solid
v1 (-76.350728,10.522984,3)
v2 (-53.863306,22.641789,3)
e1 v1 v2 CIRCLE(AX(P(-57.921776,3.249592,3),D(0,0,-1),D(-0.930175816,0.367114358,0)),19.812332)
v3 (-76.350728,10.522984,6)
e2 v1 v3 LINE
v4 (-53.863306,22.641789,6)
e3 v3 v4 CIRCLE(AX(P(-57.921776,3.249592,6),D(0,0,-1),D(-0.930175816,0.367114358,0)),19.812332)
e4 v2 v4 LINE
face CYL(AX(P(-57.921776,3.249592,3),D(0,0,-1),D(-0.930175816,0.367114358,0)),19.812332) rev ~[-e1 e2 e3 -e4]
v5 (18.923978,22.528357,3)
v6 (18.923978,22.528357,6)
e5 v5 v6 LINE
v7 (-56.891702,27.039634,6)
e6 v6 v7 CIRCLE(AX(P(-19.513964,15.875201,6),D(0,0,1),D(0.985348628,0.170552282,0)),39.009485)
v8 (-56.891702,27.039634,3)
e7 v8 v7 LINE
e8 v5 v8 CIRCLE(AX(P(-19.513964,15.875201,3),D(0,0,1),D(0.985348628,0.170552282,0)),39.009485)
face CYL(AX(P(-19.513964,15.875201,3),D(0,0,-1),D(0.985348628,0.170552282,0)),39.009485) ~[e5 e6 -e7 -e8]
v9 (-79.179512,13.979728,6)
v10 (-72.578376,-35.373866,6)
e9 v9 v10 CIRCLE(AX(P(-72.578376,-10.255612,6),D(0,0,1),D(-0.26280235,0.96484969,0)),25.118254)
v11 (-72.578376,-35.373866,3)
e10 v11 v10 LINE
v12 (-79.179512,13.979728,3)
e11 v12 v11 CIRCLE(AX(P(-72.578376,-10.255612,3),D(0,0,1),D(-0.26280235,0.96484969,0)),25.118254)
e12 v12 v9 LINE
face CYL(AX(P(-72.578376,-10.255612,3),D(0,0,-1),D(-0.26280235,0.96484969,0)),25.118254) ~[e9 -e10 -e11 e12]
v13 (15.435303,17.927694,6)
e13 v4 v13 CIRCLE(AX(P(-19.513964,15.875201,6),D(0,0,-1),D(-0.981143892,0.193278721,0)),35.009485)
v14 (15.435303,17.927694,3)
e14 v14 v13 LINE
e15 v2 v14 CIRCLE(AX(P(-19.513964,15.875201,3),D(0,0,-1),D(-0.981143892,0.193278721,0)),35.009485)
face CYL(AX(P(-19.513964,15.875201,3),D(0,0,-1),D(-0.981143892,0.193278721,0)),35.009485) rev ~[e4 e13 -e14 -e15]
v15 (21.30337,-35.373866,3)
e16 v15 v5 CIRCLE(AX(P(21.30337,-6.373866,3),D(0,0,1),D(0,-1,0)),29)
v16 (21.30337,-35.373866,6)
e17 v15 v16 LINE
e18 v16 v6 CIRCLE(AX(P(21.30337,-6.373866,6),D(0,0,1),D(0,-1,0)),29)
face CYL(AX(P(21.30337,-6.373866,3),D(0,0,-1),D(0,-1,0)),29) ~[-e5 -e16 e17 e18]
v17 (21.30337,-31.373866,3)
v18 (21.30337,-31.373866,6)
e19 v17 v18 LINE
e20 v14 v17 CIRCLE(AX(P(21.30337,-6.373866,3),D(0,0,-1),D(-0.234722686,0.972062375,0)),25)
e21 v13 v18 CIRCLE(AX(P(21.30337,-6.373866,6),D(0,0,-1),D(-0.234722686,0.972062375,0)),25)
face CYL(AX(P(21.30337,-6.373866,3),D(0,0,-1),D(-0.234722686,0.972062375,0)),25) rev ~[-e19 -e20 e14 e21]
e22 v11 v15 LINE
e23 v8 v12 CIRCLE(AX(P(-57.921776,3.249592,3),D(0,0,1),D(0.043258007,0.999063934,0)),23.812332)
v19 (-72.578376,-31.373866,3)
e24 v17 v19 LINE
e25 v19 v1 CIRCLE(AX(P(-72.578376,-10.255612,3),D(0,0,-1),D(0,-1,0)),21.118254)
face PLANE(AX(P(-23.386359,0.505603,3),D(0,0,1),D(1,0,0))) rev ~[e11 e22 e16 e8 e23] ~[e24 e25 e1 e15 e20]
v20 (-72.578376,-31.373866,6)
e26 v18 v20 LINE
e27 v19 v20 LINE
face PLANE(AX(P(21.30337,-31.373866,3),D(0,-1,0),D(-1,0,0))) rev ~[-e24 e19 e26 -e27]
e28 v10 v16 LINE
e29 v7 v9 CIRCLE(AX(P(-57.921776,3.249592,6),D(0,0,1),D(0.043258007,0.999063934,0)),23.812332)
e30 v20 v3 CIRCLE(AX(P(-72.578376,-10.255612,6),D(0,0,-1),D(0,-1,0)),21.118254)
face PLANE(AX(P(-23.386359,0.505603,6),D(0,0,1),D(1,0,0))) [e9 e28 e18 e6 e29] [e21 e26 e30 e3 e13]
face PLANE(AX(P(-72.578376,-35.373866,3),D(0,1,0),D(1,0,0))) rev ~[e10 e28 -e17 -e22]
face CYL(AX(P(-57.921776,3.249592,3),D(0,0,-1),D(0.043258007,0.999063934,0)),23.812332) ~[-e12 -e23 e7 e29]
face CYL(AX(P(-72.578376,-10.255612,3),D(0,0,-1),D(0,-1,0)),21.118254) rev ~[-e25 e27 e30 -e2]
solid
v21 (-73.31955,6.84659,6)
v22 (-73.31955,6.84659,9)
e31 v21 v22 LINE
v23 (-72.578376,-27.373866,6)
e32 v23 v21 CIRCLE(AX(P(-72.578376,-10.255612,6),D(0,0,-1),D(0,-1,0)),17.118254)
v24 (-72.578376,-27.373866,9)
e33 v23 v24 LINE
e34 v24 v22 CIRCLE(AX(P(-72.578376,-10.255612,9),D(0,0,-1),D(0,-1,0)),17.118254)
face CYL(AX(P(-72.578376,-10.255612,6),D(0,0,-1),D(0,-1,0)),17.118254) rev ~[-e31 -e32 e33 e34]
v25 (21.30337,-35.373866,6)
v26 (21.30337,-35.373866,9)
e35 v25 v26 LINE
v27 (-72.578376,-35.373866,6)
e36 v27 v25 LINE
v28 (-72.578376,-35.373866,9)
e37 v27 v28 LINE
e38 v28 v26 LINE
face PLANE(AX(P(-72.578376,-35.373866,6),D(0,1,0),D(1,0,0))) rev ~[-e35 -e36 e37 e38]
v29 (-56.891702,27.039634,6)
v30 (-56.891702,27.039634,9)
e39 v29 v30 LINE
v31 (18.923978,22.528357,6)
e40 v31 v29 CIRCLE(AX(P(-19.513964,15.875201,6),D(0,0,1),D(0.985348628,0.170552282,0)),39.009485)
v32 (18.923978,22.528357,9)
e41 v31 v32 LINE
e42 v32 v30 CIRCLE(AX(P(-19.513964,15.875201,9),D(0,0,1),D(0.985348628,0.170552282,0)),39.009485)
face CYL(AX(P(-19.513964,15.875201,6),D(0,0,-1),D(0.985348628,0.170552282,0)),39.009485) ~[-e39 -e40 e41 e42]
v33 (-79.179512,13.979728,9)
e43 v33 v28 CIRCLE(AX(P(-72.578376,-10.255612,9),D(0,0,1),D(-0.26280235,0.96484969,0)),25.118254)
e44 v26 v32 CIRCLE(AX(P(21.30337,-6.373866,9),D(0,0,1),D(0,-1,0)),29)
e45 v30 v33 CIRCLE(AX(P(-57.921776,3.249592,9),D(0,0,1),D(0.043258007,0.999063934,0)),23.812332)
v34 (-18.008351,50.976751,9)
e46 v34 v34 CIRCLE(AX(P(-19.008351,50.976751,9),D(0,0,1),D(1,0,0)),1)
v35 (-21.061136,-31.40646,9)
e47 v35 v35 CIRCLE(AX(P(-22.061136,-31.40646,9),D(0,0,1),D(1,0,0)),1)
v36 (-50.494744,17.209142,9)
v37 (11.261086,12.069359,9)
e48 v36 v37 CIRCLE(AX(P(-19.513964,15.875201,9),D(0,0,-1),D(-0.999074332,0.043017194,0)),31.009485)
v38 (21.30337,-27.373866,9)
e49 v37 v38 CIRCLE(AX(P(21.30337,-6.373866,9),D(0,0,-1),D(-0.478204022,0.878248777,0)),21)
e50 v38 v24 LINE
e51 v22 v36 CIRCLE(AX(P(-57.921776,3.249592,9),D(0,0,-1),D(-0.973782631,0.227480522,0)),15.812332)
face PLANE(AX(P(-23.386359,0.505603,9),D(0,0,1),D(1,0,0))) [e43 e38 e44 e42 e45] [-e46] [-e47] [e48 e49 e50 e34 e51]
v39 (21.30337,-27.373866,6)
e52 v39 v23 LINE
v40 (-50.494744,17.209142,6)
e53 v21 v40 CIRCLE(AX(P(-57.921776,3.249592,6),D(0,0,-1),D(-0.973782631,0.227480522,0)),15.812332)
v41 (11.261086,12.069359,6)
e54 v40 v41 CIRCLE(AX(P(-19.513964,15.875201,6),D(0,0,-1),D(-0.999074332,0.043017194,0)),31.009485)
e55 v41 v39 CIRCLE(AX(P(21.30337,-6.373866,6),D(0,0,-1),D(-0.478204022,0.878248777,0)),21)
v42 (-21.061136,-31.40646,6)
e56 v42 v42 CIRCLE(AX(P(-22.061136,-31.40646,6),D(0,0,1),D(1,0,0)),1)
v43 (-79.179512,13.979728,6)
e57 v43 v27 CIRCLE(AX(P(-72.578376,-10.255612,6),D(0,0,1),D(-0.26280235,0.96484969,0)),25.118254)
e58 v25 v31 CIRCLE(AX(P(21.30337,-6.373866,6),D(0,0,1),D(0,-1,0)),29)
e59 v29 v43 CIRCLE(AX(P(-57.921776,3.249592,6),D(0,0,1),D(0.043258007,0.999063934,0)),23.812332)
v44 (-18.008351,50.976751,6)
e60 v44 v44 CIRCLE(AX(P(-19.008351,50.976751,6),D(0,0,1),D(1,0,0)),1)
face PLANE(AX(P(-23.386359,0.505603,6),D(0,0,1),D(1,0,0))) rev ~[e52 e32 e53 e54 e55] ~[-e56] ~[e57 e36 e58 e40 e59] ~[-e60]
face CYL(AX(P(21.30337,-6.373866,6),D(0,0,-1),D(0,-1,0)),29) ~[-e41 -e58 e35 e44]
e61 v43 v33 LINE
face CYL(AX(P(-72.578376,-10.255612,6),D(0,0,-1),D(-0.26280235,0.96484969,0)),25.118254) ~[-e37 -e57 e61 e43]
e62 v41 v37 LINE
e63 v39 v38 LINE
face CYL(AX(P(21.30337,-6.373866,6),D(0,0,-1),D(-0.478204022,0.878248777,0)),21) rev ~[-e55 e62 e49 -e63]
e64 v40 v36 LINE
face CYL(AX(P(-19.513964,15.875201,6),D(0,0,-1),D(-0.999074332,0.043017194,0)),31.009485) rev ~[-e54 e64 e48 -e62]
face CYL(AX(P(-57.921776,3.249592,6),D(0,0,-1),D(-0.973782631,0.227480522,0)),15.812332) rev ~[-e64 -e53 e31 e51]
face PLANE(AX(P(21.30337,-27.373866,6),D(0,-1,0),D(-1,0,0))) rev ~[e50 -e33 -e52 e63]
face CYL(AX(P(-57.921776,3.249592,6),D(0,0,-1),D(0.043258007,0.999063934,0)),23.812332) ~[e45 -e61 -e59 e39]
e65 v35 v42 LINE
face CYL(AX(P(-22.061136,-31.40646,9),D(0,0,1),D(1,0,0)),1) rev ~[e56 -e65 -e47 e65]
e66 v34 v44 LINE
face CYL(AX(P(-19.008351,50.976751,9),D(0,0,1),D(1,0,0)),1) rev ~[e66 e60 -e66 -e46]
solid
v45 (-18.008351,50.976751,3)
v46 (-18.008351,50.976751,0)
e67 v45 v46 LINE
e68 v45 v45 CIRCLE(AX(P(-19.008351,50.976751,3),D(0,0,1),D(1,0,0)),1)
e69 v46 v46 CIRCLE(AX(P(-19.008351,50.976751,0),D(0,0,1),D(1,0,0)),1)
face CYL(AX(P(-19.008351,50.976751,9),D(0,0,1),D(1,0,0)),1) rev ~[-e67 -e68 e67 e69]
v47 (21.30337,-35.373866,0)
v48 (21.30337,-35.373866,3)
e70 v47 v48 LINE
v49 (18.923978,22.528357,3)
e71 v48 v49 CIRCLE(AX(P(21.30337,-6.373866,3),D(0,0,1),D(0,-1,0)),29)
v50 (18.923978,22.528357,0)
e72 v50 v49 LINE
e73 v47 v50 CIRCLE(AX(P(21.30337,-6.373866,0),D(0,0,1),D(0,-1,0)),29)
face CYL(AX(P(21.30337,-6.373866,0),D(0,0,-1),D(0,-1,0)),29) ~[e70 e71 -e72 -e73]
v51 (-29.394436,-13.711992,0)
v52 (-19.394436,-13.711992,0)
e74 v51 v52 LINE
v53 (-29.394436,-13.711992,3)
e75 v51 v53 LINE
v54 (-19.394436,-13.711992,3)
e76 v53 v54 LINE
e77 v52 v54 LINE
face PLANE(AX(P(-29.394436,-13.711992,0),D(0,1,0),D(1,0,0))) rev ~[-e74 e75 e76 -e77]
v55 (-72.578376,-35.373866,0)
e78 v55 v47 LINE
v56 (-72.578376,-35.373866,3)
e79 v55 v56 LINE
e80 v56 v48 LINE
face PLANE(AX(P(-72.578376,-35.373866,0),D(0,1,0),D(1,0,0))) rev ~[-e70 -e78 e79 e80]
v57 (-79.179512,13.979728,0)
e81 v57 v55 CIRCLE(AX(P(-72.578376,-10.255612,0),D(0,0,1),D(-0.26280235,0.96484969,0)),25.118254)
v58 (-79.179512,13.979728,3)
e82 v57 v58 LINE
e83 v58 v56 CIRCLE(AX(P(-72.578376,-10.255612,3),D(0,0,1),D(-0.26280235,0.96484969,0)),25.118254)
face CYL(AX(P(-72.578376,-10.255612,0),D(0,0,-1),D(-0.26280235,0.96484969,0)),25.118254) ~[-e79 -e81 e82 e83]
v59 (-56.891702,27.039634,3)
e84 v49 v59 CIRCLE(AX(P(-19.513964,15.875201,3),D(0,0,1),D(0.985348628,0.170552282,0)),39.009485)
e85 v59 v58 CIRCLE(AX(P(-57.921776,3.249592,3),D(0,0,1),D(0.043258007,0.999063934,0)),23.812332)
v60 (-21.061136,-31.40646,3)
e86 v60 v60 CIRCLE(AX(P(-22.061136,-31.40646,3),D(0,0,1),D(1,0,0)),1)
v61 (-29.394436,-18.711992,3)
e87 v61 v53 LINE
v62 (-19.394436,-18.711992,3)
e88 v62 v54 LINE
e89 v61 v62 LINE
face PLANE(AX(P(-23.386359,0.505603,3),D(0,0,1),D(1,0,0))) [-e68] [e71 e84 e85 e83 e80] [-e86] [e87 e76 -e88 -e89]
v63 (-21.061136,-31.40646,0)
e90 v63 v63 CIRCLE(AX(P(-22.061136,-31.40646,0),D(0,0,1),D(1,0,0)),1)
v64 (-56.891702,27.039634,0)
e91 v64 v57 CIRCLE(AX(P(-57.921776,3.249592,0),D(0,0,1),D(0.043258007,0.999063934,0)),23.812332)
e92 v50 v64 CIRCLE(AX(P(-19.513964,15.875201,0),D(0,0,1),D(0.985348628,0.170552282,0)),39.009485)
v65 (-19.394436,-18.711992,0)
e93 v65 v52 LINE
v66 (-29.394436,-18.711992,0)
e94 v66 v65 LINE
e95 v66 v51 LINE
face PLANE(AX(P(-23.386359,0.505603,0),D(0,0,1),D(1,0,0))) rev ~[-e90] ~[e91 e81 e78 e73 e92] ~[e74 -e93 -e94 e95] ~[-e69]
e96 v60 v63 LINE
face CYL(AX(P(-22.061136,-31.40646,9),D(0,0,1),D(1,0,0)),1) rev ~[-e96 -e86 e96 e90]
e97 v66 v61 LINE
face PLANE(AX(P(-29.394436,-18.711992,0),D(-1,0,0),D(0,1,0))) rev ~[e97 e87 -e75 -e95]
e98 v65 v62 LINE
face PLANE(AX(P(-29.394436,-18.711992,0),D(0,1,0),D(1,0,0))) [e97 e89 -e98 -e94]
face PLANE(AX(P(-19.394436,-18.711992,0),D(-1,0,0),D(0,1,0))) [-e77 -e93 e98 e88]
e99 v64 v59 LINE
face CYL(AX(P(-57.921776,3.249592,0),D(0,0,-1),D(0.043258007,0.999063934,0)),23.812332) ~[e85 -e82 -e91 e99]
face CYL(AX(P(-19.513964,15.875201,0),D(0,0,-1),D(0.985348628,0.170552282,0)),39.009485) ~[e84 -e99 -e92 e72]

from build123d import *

# Parameters (mm, degrees)
F1_W     = 10
F1_H     = 5
F2_DEPTH = 3
F4_DEPTH = 3
F6_DEPTH = 3
F7_R     = 1
F8_DEPTH = 9.001


with BuildPart() as f2:
    # F1 (on Top) → F2 (new body)
    with BuildSketch(Plane.XY):
        with BuildLine():
            ThreePointArc((18.9239778624, 22.528357261), (-17.196872912, 54.8158089274), (-56.8917024575, 27.0396338283))
            ThreePointArc((-56.8917024575, 27.0396338283), (-69.9604581217, 23.7945983478), (-79.1795119252, 13.9797281576))
            ThreePointArc((-79.1795119252, 13.9797281576), (-97.4749227856, -13.5855716738), (-72.5783757035, -35.3738657037))
            Line((-72.5783757035, -35.3738657037), (21.3033701587, -35.3738657037))
            ThreePointArc((21.3033701587, -35.3738657037), (50.2789155891, -5.1831654845), (18.9239778624, 22.528357261))
        make_face()
        with Locations((-24.3944358081, -16.2119916081)):
            Rectangle(F1_W, F1_H, mode=Mode.SUBTRACT)
    extrude(amount=F2_DEPTH)


with BuildPart() as f4:
    # F3 (on face) → F4 (new body)
    with BuildSketch(Plane.XY.offset(3)):
        with BuildLine():
            ThreePointArc((21.3033701587, -35.3738657037), (50.2789155891, -5.1831654845), (18.9239778624, 22.528357261))
            ThreePointArc((18.9239778624, 22.528357261), (-17.196872912, 54.8158089274), (-56.8917024575, 27.0396338283))
            ThreePointArc((-56.8917024575, 27.0396338283), (-69.9604581217, 23.7945983478), (-79.1795119252, 13.9797281576))
            ThreePointArc((-79.1795119252, 13.9797281576), (-97.4749227856, -13.5855716738), (-72.5783757035, -35.3738657037))
            Line((-72.5783757035, -35.3738657037), (21.3033701587, -35.3738657037))
        make_face()
        with BuildLine():
            ThreePointArc((-76.3507281586, 10.522983545), (-67.3209277766, 20.6904762333), (-53.8633061169, 22.641789065))
            ThreePointArc((-53.8633061169, 22.641789065), (-17.1379062519, 50.8039618254), (15.4353030162, 17.9276936704))
            ThreePointArc((15.4353030162, 17.9276936704), (46.1281459316, -3.4191224282), (21.3033701587, -31.3738657037))
            Line((21.3033701587, -31.3738657037), (-72.5783757035, -31.3738657037))
            ThreePointArc((-72.5783757035, -31.3738657037), (-93.6115436771, -12.149418004), (-76.3507281586, 10.522983545))
        make_face(mode=Mode.SUBTRACT)
    extrude(amount=F4_DEPTH)


with BuildPart() as f6:
    # F5 (on face) → F6 (new body)
    with BuildSketch(Plane.XY.offset(6)):
        with BuildLine():
            ThreePointArc((18.9239778624, 22.528357261), (-17.196872912, 54.8158089274), (-56.8917024575, 27.0396338283))
            ThreePointArc((-56.8917024575, 27.0396338283), (-69.9604581217, 23.7945983478), (-79.1795119252, 13.9797281576))
            ThreePointArc((-79.1795119252, 13.9797281576), (-97.4749227856, -13.5855716738), (-72.5783757035, -35.3738657037))
            Line((-72.5783757035, -35.3738657037), (21.3033701587, -35.3738657037))
            ThreePointArc((21.3033701587, -35.3738657037), (50.2789155891, -5.1831654845), (18.9239778624, 22.528357261))
        make_face()
        with BuildLine():
            ThreePointArc((-73.3195503129, 6.846589606), (-64.4585036261, 17.6475443755), (-50.494744269, 17.2091416674))
            ThreePointArc((-50.494744269, 17.2091416674), (-16.9420148184, 46.7778414524), (11.2610857029, 12.0693586052))
            ThreePointArc((11.2610857029, 12.0693586052), (41.6541405432, -1.1925391596), (21.3033701587, -27.3738657037))
            Line((21.3033701587, -27.3738657037), (-72.5783757035, -27.3738657037))
            ThreePointArc((-72.5783757035, -27.3738657037), (-89.6926161293, -10.6262857825), (-73.3195503129, 6.846589606))
        make_face(mode=Mode.SUBTRACT)
    extrude(amount=F6_DEPTH)


with BuildPart() as f8_tool:
    # F7 (on face) → F8 (new body, through all)
    with BuildSketch(Plane.XY.offset(9)):
        with Locations((-22.0611357199, -31.4064599472)):
            Circle(F7_R)
        with Locations((-19.0083511606, 50.9767510554)):
            Circle(F7_R)
    extrude(amount=-F8_DEPTH)


with BuildPart() as f2_1:
    add(f2.part)

    # F8: cut by f8_tool
    add(f8_tool.part, mode=Mode.SUBTRACT)


with BuildPart() as f6_1:
    add(f6.part)

    # F8: cut by f8_tool
    add(f8_tool.part, mode=Mode.SUBTRACT)


solid = Compound([f4.part, f2_1.part, f6_1.part])
